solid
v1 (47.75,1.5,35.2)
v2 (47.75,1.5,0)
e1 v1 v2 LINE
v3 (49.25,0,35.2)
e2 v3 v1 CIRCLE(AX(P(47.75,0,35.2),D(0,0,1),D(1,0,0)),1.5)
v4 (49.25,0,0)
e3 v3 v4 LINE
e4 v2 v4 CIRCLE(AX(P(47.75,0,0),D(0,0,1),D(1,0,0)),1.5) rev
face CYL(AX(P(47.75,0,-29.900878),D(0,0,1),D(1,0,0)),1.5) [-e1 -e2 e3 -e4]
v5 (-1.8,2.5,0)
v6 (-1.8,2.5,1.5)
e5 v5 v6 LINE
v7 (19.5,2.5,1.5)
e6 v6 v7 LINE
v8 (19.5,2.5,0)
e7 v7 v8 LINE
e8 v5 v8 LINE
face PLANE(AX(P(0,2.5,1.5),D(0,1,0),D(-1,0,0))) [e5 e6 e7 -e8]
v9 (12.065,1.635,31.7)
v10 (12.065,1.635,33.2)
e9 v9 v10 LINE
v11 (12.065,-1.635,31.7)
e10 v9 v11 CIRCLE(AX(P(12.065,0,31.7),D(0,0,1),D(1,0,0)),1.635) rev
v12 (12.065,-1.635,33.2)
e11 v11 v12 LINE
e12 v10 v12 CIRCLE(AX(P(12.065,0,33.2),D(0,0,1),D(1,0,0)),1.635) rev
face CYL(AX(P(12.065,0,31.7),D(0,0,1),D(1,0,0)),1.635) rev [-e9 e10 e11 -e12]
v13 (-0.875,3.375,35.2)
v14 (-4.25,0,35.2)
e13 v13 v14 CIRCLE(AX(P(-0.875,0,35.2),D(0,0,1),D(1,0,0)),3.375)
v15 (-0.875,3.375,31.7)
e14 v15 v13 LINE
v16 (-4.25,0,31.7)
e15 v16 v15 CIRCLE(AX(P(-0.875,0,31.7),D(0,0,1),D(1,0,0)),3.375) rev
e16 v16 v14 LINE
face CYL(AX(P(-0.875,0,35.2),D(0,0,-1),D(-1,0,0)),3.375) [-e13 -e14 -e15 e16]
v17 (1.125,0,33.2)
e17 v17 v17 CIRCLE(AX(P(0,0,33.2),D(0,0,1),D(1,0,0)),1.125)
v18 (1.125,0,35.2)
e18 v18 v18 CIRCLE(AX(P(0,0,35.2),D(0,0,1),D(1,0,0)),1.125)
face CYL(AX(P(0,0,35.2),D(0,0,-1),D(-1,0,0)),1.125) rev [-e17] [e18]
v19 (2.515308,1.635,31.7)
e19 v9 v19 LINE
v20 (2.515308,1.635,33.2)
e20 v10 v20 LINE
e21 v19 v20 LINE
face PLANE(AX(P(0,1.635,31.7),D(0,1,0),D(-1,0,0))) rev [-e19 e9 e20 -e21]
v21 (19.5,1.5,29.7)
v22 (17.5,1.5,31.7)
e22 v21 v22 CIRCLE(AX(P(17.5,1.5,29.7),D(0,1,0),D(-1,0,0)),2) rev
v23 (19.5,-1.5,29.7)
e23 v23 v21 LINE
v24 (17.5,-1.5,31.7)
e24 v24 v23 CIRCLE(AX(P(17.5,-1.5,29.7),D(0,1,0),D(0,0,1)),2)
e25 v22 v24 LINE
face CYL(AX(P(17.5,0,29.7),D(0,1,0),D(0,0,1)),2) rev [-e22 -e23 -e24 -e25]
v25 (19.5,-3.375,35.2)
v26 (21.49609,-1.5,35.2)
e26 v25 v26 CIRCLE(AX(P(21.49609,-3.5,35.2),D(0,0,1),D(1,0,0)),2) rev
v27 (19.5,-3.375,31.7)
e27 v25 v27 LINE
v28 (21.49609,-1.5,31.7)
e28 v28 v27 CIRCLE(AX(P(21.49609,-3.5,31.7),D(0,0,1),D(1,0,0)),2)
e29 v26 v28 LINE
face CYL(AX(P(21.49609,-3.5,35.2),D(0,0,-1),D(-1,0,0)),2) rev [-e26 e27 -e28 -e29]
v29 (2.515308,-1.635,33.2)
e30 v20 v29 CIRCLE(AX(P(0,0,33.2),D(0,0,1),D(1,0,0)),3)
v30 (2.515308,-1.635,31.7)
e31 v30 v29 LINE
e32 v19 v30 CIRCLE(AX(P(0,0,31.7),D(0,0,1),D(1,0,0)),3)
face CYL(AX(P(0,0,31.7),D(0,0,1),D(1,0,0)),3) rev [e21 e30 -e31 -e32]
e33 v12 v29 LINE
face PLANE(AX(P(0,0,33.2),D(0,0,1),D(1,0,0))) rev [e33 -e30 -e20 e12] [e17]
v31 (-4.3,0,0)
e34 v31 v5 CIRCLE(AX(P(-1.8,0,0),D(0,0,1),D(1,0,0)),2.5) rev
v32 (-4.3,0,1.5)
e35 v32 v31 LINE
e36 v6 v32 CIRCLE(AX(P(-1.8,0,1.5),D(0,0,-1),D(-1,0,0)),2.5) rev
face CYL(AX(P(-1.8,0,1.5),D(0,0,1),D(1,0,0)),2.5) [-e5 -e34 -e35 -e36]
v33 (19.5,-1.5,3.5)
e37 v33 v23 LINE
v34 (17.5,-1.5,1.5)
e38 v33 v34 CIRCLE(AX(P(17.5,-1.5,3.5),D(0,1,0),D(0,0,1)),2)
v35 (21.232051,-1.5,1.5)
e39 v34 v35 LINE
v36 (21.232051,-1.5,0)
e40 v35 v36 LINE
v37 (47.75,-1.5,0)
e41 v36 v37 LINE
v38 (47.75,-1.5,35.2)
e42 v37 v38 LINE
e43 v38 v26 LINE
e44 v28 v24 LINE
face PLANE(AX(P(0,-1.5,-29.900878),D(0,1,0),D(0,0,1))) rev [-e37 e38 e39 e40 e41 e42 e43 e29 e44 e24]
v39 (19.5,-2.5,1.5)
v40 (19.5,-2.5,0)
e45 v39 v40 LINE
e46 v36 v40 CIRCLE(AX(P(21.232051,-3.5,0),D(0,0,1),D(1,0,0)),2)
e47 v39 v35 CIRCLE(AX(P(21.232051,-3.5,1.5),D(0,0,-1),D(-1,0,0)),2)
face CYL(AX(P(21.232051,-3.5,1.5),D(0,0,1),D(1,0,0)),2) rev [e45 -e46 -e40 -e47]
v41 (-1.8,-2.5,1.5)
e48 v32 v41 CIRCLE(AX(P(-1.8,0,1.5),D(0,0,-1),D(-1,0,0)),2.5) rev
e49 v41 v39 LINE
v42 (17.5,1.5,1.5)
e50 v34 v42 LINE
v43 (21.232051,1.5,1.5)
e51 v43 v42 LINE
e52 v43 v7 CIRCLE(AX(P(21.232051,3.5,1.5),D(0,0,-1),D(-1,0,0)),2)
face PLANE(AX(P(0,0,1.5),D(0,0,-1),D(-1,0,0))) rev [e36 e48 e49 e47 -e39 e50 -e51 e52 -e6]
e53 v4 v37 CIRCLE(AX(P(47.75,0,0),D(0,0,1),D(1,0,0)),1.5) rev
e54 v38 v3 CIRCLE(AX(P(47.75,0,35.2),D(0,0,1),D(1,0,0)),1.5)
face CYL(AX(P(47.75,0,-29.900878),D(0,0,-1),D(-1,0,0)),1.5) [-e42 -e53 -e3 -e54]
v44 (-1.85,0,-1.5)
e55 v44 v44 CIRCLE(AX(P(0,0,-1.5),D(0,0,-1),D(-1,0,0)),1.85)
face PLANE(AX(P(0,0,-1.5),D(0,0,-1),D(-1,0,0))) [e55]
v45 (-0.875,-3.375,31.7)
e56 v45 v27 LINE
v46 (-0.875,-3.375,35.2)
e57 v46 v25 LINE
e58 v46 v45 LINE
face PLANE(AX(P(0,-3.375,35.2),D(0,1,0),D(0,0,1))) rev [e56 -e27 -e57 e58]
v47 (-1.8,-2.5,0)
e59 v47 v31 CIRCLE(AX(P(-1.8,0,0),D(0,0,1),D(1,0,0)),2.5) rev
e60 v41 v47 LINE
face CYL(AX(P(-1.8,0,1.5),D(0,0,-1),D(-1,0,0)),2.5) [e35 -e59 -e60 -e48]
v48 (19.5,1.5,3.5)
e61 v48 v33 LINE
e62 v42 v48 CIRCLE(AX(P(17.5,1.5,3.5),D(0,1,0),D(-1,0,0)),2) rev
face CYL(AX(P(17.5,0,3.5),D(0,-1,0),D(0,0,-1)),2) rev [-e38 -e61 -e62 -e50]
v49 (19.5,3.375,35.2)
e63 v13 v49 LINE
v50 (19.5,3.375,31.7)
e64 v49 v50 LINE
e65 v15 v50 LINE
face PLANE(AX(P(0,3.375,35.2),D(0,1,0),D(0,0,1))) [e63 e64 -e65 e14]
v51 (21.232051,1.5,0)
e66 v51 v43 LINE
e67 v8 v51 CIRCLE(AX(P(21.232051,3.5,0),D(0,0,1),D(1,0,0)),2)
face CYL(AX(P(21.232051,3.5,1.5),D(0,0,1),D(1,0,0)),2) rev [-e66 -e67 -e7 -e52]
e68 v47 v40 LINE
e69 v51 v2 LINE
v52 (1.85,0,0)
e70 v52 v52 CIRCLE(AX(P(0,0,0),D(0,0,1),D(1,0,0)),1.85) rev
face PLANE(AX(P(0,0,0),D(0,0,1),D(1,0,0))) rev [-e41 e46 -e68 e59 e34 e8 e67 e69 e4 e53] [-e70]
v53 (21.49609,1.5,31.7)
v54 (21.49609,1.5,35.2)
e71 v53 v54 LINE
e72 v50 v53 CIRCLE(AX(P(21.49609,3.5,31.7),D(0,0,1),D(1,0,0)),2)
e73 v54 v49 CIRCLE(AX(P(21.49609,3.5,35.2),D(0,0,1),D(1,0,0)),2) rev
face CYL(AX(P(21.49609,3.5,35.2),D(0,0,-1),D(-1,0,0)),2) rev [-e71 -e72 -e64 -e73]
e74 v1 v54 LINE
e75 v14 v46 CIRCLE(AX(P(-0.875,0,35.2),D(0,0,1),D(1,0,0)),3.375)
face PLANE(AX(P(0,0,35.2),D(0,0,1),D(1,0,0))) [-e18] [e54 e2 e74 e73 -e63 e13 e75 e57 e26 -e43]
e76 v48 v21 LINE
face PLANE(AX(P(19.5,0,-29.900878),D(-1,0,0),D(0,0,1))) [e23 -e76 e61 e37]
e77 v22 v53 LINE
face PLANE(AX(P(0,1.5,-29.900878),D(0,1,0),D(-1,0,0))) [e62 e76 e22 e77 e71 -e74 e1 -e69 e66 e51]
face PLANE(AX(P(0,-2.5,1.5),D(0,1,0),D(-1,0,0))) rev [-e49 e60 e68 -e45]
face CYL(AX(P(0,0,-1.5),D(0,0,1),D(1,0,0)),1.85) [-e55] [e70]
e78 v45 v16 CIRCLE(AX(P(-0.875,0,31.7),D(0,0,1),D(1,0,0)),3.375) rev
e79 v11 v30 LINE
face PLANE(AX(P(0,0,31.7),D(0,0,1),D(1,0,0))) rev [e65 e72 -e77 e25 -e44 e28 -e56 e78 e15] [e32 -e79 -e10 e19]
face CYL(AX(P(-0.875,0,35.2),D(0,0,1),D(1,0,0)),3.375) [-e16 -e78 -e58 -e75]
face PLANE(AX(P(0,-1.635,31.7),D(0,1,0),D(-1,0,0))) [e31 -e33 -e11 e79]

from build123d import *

# Parameters (mm, degrees)
BOSS_EXTRUDE10_DEPTH = 2
BOSS_EXTRUDE15_DEPTH = 1.5
BOSS_EXTRUDE17_START = 2
SKETCH1_17_W         = 29.75
SKETCH1_17_H         = 3
BOSS_EXTRUDE17_DEPTH = 35.2
SKETCH2_W            = 23.8
SKETCH2_H            = 5
BOSS_EXTRUDE18_DEPTH = 1.5
FILLET1_R            = 2
FILLET3_R            = 2
FILLET2_R            = 3.375
FILLET5_R            = 2.5
SKETCH4_R            = 1.85
BOSS_EXTRUDE19_DEPTH = 1.5
FILLET4_R            = 1.5


# Some blends are built 0.0001 mm under size
with BuildPart() as part:
    # Sketch1 → Boss-Extrude10 (new body)
    # profile 1 of 6: a face of its own
    with BuildSketch(Plane.XY.offset(33.2)):
        Polygon((-4.25, 3.375), (-4.25, -3.375), (19.5, -3.375), (19.5, -1.5), (19.5, 1.5), (19.5, 3.375), align=None)
        with BuildLine():
            ThreePointArc((2.515308132, -1.635), (-2.636759375, -1.430908802), (0, 3))
            ThreePointArc((0, 3), (1.430908802, 2.636759375), (2.515308132, 1.635))
            Line((2.515308132, 1.635), (12.065, 1.635))
            ThreePointArc((12.065, 1.635), (13.7, 0), (12.065, -1.635))
            Line((12.065, -1.635), (2.515308132, -1.635))
        make_face(mode=Mode.SUBTRACT)
    # profile 2 of 6: a face of its own
    with BuildSketch(Plane.XY.offset(33.2)):
        with BuildLine():
            Line((12.065, 1.635), (2.515308132, 1.635))
            ThreePointArc((2.515308132, 1.635), (2.876275751, 0.852665117), (3, 0))
            ThreePointArc((3, 0), (2.876275751, -0.852665117), (2.515308132, -1.635))
            Line((2.515308132, -1.635), (12.065, -1.635))
            Line((12.065, -1.635), (12.065, 1.635))
        make_face()
    # profile 3 of 6: a face of its own
    with BuildSketch(Plane.XY.offset(33.2)):
        with BuildLine():
            ThreePointArc((12.065, 1.635), (13.7, 0), (12.065, -1.635))
            Line((12.065, -1.635), (12.065, 1.635))
        make_face()
    # profile 4 of 6: a face of its own
    with BuildSketch(Plane.XY.offset(33.2)):
        with BuildLine():
            Line((0, 1.125), (0, 1.635))
            Line((0, 1.635), (0, 3))
            ThreePointArc((0, 3), (-2.636759375, -1.430908802), (2.515308132, -1.635))
            Line((2.515308132, -1.635), (0, -1.635))
            Line((0, -1.635), (0, -1.125))
            ThreePointArc((0, -1.125), (-1.125, 0), (0, 1.125))
        make_face()
    # profile 5 of 6: a face of its own
    with BuildSketch(Plane.XY.offset(33.2)):
        with BuildLine():
            Line((2.515308132, 1.635), (0, 1.635))
            Line((0, 1.635), (0, 1.125))
            ThreePointArc((0, 1.125), (0.795495129, 0.795495129), (1.125, 0))
            ThreePointArc((1.125, 0), (0.795495129, -0.795495129), (0, -1.125))
            Line((0, -1.125), (0, -1.635))
            Line((0, -1.635), (2.515308132, -1.635))
            ThreePointArc((2.515308132, -1.635), (2.876275751, -0.852665117), (3, 0))
            ThreePointArc((3, 0), (2.876275751, 0.852665117), (2.515308132, 1.635))
        make_face()
    # profile 6 of 6: a face of its own
    with BuildSketch(Plane.XY.offset(33.2)):
        with BuildLine():
            Line((0, 3), (0, 1.635))
            Line((0, 1.635), (2.515308132, 1.635))
            ThreePointArc((2.515308132, 1.635), (1.430908802, 2.636759375), (0, 3))
        make_face()
    extrude(amount=BOSS_EXTRUDE10_DEPTH)

    # Sketch1<16> → Boss-Extrude15 (add)
    with BuildSketch(Plane.XY.offset(33.2)):
        Polygon((-4.25, 3.375), (-4.25, -3.375), (19.5, -3.375), (19.5, -1.5), (19.5, 1.5), (19.5, 3.375), align=None)
        with BuildLine():
            ThreePointArc((12.065, 1.635), (13.7, 0), (12.065, -1.635))
            Line((12.065, -1.635), (2.515308132, -1.635))
            ThreePointArc((2.515308132, -1.635), (-3, 0), (2.515308132, 1.635))
            Line((2.515308132, 1.635), (12.065, 1.635))
        make_face(mode=Mode.SUBTRACT)
    extrude(amount=-BOSS_EXTRUDE15_DEPTH)

    # Sketch1<17> → Boss-Extrude17 (add)
    with BuildSketch(Plane.XY.offset(33.2).offset(BOSS_EXTRUDE17_START)):
        with Locations((34.375, 0)):
            Rectangle(SKETCH1_17_W, SKETCH1_17_H)
    extrude(amount=-BOSS_EXTRUDE17_DEPTH)

    # Sketch2 → Boss-Extrude18 (add)
    with BuildSketch(Plane(origin=(0, 0, 0), x_dir=(-1, 0, 0), z_dir=(0, 0, -1))):
        with Locations((-7.6, 0)):
            Rectangle(SKETCH2_W, SKETCH2_H)
    extrude(amount=-BOSS_EXTRUDE18_DEPTH)

    # Fillet1
    # the kernel refuses this fillet: 2 mm, written as the material it adds along each edge
    with BuildSketch(Plane(origin=(19.5, 1.5, 1.5), x_dir=(1, 0, 0), z_dir=(0, 0, -1))) as fillet1_piece_1:
        with BuildLine():
            CenterArc((1.732050808, -2), FILLET1_R, 90, 60)
            Line((0, -1), (0, 0))
            Line((0, 0), (1.732050808, 0))
        make_face()
    extrude(amount=1.5)
    with BuildSketch(Plane(origin=(19.5, -1.5, 1.5), x_dir=(1, 0, 0), z_dir=(0, 0, -1))) as fillet1_piece_2:
        with BuildLine():
            CenterArc((1.732050808, 2), FILLET1_R, 210, 60)
            Line((0, 1), (0, 0))
            Line((0, 0), (1.732050808, 0))
        make_face()
    extrude(amount=1.5)
    with BuildSketch(Plane(origin=(19.5, -1.5, 35.2), x_dir=(0, -1, 0), z_dir=(0, 0, -1))) as fillet1_piece_3:
        with BuildLine():
            CenterArc((2, -1.996089928), FILLET1_R, 93.583321698, 86.416678302)
            Line((0, -1.996089928), (0, 0))
            Line((0, 0), (1.875, 0))
        make_face()
    extrude(amount=3.5)
    with BuildSketch(Plane(origin=(19.5, 1.5, 35.2), x_dir=(0, 1, 0), z_dir=(0, 0, -1))) as fillet1_piece_4:
        with BuildLine():
            CenterArc((2, 1.996089928), FILLET1_R, 180, 86.416678302)
            Line((0, 1.996089928), (0, 0))
            Line((0, 0), (1.875, 0))
        make_face()
    extrude(amount=3.5)

    # Fillet3
    fillet3_edges = [part.edges().sort_by_distance(p)[0] for p in [
        (19.5, 0, 31.7),
        (19.5, 0, 1.5),
    ]]
    fillet(fillet3_edges, radius=FILLET3_R)

    # Fillet2
    fillet2_edges = [part.edges().sort_by_distance(p)[0] for p in [
        (-4.25, 3.375, 33.45),
        (-4.25, -3.375, 33.45),
    ]]
    fillet(fillet2_edges, radius=FILLET2_R - 0.0001)  # a hair under: the kernel refuses the full size

    # Fillet5
    fillet5_edges = [part.edges().sort_by_distance(p)[0] for p in [
        (-4.3, -2.5, 0.75),
        (-4.3, 2.5, 0.75),
    ]]
    fillet(fillet5_edges, radius=FILLET5_R - 0.0001)  # a hair under: the kernel refuses the full size

    # Sketch4 → Boss-Extrude19 (add)
    with BuildSketch(Plane(origin=(0, 0, 0), x_dir=(-1, 0, 0), z_dir=(0, 0, -1))):
        with Locations(Location((0, 0, 0), (0, 0, 180))):
            Circle(SKETCH4_R)
    extrude(amount=BOSS_EXTRUDE19_DEPTH)

    # Fillet4
    fillet4_edges = [part.edges().sort_by_distance(p)[0] for p in [
        (49.25, 1.5, 17.6),
        (49.25, -1.5, 17.6),
    ]]
    fillet(fillet4_edges, radius=FILLET4_R - 0.0001)  # a hair under: the kernel refuses the full size


solid = part.part
